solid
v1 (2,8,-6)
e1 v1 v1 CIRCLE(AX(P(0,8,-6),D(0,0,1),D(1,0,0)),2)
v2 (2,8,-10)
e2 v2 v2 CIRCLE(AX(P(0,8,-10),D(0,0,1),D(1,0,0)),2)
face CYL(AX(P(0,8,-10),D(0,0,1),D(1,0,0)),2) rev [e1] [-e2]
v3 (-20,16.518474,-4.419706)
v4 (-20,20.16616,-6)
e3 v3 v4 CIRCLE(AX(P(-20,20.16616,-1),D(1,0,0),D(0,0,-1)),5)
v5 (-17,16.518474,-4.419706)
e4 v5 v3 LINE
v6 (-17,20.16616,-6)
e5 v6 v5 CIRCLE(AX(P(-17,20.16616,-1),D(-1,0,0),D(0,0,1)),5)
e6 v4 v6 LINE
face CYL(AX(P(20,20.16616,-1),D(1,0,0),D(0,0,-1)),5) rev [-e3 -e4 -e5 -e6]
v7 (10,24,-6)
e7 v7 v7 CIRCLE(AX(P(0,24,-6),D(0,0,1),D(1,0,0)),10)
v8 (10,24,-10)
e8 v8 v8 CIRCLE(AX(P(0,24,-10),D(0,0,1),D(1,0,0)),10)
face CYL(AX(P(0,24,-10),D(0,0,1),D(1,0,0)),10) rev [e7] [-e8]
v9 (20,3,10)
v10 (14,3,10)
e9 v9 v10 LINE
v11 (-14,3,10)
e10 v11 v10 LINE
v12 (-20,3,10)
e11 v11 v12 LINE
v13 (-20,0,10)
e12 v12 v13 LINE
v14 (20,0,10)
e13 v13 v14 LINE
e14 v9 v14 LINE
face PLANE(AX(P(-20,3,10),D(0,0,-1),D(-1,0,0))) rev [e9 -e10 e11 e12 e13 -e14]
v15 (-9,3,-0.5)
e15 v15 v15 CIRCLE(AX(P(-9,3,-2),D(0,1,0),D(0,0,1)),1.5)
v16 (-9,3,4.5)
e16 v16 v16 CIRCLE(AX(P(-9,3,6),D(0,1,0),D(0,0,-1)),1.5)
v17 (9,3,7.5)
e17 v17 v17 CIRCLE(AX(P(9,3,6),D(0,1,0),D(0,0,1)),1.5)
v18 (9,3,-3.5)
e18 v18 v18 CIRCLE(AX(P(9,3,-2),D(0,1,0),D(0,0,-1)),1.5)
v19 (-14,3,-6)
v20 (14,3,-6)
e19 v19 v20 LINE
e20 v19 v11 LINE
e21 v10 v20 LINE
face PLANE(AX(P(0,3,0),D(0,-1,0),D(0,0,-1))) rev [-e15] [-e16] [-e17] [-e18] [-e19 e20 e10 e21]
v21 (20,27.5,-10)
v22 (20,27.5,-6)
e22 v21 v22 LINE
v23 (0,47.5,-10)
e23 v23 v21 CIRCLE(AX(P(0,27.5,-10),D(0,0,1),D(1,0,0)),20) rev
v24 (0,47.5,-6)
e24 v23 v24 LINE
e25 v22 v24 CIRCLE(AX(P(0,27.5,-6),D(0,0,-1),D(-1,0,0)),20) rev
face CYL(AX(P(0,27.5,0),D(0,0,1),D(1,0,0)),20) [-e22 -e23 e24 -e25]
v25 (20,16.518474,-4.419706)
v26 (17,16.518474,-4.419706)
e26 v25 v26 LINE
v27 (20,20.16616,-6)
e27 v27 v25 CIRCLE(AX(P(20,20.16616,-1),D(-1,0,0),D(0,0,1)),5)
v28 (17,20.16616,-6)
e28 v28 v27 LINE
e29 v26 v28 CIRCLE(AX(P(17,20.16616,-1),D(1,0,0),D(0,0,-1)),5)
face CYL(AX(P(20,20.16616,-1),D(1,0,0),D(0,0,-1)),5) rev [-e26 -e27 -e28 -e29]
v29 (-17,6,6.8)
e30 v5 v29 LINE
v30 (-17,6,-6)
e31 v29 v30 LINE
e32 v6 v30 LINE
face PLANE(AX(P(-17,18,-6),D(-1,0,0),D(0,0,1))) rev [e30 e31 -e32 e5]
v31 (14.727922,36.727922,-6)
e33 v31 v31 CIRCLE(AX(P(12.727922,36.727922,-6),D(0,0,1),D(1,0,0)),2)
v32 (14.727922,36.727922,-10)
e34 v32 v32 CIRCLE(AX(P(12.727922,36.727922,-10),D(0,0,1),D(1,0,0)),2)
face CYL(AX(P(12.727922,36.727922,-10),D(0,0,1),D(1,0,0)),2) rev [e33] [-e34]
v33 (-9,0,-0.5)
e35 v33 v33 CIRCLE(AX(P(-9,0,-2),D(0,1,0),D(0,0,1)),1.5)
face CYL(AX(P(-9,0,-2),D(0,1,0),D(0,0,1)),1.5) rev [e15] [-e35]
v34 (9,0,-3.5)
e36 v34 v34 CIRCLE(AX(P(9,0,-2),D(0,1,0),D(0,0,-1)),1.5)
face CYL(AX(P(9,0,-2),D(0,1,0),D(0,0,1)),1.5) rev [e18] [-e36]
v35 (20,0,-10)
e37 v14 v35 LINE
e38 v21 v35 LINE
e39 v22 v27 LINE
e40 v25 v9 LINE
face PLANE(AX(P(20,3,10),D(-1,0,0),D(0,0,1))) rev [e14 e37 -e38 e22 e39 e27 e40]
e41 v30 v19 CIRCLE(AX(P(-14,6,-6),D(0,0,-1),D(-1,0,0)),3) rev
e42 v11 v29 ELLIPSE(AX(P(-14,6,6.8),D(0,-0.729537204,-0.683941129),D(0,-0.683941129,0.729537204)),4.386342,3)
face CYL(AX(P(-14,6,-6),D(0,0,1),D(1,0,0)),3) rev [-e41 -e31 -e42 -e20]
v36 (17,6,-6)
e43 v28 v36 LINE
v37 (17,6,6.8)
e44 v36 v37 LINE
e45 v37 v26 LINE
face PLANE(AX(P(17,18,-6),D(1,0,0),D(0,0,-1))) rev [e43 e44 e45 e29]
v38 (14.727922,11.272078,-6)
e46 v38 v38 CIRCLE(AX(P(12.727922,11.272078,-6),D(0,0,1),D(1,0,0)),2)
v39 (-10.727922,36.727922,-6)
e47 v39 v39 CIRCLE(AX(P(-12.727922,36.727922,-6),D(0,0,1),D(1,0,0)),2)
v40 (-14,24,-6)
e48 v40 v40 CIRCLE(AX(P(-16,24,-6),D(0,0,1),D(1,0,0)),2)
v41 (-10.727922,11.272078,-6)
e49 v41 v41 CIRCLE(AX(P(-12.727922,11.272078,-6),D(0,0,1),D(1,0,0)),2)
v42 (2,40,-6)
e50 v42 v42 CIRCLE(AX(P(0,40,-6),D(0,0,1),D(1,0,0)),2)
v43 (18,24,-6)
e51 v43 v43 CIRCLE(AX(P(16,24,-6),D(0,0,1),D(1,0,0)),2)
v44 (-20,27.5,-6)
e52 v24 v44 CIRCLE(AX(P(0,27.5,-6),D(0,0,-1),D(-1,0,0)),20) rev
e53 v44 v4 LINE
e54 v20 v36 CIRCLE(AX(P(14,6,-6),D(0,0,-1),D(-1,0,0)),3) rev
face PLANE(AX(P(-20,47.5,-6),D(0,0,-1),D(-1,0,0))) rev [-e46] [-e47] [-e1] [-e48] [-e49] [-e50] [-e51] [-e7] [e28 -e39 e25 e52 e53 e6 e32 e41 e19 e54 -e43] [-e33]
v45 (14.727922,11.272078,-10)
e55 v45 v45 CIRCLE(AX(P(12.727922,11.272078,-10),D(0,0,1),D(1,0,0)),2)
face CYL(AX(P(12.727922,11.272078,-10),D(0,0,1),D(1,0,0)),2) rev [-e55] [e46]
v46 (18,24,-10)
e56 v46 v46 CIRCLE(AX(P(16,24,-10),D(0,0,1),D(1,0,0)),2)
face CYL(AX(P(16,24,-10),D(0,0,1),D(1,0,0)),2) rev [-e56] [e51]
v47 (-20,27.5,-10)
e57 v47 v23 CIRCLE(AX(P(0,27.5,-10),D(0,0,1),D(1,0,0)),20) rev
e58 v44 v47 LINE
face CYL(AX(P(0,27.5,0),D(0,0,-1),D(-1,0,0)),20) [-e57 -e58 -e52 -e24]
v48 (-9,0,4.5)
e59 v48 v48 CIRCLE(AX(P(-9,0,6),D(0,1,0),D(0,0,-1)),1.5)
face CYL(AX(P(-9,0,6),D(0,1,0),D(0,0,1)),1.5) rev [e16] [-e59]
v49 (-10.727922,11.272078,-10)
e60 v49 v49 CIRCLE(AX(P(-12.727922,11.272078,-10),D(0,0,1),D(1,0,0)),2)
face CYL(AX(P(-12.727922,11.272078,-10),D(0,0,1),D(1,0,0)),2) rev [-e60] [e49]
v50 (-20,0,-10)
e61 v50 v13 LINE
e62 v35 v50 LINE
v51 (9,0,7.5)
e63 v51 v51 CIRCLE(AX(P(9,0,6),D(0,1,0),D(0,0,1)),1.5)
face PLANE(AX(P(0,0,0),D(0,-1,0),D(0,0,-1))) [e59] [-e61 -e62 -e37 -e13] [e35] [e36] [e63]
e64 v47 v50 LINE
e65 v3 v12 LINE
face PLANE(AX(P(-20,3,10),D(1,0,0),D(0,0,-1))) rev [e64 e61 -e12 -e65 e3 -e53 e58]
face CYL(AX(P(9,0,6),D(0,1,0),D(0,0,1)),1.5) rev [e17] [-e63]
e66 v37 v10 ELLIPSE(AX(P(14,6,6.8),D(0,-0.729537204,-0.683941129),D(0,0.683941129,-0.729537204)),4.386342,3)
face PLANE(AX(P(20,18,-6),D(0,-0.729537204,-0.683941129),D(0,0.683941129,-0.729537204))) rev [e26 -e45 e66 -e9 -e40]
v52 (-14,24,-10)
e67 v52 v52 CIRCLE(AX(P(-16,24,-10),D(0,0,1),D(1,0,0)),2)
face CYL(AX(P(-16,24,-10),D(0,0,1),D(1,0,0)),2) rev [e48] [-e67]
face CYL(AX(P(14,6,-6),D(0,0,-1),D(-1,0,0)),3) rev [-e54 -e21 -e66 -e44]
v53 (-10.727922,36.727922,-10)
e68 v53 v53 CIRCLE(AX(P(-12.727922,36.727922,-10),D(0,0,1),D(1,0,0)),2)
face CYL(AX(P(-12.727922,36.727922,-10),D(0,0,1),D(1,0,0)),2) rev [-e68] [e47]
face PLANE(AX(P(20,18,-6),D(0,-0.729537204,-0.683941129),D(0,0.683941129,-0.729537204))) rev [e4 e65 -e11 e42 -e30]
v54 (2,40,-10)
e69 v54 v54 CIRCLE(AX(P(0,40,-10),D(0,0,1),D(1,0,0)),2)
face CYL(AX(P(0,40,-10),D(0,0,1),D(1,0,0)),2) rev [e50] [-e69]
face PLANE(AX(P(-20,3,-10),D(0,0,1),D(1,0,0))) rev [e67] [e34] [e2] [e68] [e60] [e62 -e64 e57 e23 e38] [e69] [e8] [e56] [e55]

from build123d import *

# Parameters (mm, degrees)
SKETCH_1_W          = 40
SKETCH_1_H          = 20
EXTRUDE_1_DEPTH     = 3
SKETCH_2_W          = 40
SKETCH_2_H          = 4
EXTRUDE_2_DEPTH     = 44.5
SKETCH_3_R          = 10
SKETCH_3_R_2        = 2
CUT_EXTRUDE_1_DEPTH = 54.965266607
FILLET_1_R          = 20
SKETCH_4_W          = 3
SKETCH_4_H          = 16
EXTRUDE_3_DEPTH     = 15
CUT_EXTRUDE_2_DEPTH = 63.898728127
FILLET_2_R          = 5
FILLET_3_R          = 3
SKETCH_6_R          = 1.5
CUT_EXTRUDE_3_DEPTH = 3
SKETCH_7_R          = 2
CUT_EXTRUDE_4_DEPTH = 54.965266607


with BuildPart() as part:
    # 草图1 → 凸台-拉伸1 (new body)
    with BuildSketch(Plane(origin=(0, 0, 0), x_dir=(1, 0, 0), z_dir=(0, 1, 0))):
        Rectangle(SKETCH_1_W, SKETCH_1_H)
    extrude(amount=EXTRUDE_1_DEPTH)

    # 草图2 → 凸台-拉伸2 (add)
    with BuildSketch(Plane(origin=(0, 3, 0), x_dir=(1, 0, 0), z_dir=(0, 1, 0))):
        with Locations((0, 8)):
            Rectangle(SKETCH_2_W, SKETCH_2_H)
    extrude(amount=EXTRUDE_2_DEPTH)

    # 草图3 → 切除-拉伸1 (cut, through all)
    with BuildSketch(Plane.XY.offset(-6)):
        with Locations((0, 24)):
            Circle(SKETCH_3_R)
        with Locations((12.727922061, 36.727922061)):
            Circle(SKETCH_3_R_2)
        with Locations((12.727922061, 11.272077939)):
            Circle(SKETCH_3_R_2)
        with Locations((-12.727922061, 11.272077939)):
            Circle(SKETCH_3_R_2)
        with Locations((-12.727922061, 36.727922061)):
            Circle(SKETCH_3_R_2)
    extrude(amount=-CUT_EXTRUDE_1_DEPTH, mode=Mode.SUBTRACT)

    # 圆角1
    fillet_1_edges = [part.edges().sort_by_distance(p)[0] for p in [
        (20, 47.5, -8),
        (-20, 47.5, -8),
    ]]
    fillet(fillet_1_edges, radius=FILLET_1_R - 0.0001)  # a hair under: the kernel refuses the full size

    # 草图4 → 凸台-拉伸3 (add)
    with BuildSketch(Plane(origin=(0, 3, 0), x_dir=(1, 0, 0), z_dir=(0, 1, 0))):
        with Locations((-18.5, -2)):
            Rectangle(SKETCH_4_W, SKETCH_4_H)
        with Locations((18.5, -2)):
            Rectangle(SKETCH_4_W, SKETCH_4_H)
    extrude(amount=EXTRUDE_3_DEPTH)

    # 草图5 → 切除-拉伸2 (cut, through all)
    with BuildSketch(Plane.ZY.offset(20)):
        Polygon((-6, 18), (10, 3), (10, 18), align=None)
    extrude(amount=-CUT_EXTRUDE_2_DEPTH, mode=Mode.SUBTRACT)

    # 圆角2
    fillet_2_edges = [part.edges().sort_by_distance(p)[0] for p in [
        (-18.5, 18, -6),
        (18.5, 18, -6),
    ]]
    fillet(fillet_2_edges, radius=FILLET_2_R)

    # 圆角3
    fillet_3_edges = [part.edges().sort_by_distance(p)[0] for p in [
        (-17, 3, 2),
        (17, 3, 2),
    ]]
    fillet(fillet_3_edges, radius=FILLET_3_R)

    # 草图6 → 切除-拉伸3 (cut)
    with BuildSketch(Plane(origin=(0, 3, 0), x_dir=(1, 0, 0), z_dir=(0, 1, 0))):
        with Locations(Location((-9, 2, 0), (0, 0, 270))):
            Circle(SKETCH_6_R)
        with Locations(Location((9, 2, 0), (0, 0, 90))):
            Circle(SKETCH_6_R)
        with Locations(Location((9, -6, 0), (0, 0, 270))):
            Circle(SKETCH_6_R)
        with Locations(Location((-9, -6, 0), (0, 0, 90))):
            Circle(SKETCH_6_R)
    extrude(amount=-CUT_EXTRUDE_3_DEPTH, mode=Mode.SUBTRACT)

    # 草图7 → 切除-拉伸4 (cut, through all)
    with BuildSketch(Plane.XY.offset(-6)):
        with Locations((0, 40)):
            Circle(SKETCH_7_R)
        with Locations((-16, 24)):
            Circle(SKETCH_7_R)
        with Locations((0, 8)):
            Circle(SKETCH_7_R)
        with Locations((16, 24)):
            Circle(SKETCH_7_R)
    extrude(amount=-CUT_EXTRUDE_4_DEPTH, mode=Mode.SUBTRACT)


solid = part.part
